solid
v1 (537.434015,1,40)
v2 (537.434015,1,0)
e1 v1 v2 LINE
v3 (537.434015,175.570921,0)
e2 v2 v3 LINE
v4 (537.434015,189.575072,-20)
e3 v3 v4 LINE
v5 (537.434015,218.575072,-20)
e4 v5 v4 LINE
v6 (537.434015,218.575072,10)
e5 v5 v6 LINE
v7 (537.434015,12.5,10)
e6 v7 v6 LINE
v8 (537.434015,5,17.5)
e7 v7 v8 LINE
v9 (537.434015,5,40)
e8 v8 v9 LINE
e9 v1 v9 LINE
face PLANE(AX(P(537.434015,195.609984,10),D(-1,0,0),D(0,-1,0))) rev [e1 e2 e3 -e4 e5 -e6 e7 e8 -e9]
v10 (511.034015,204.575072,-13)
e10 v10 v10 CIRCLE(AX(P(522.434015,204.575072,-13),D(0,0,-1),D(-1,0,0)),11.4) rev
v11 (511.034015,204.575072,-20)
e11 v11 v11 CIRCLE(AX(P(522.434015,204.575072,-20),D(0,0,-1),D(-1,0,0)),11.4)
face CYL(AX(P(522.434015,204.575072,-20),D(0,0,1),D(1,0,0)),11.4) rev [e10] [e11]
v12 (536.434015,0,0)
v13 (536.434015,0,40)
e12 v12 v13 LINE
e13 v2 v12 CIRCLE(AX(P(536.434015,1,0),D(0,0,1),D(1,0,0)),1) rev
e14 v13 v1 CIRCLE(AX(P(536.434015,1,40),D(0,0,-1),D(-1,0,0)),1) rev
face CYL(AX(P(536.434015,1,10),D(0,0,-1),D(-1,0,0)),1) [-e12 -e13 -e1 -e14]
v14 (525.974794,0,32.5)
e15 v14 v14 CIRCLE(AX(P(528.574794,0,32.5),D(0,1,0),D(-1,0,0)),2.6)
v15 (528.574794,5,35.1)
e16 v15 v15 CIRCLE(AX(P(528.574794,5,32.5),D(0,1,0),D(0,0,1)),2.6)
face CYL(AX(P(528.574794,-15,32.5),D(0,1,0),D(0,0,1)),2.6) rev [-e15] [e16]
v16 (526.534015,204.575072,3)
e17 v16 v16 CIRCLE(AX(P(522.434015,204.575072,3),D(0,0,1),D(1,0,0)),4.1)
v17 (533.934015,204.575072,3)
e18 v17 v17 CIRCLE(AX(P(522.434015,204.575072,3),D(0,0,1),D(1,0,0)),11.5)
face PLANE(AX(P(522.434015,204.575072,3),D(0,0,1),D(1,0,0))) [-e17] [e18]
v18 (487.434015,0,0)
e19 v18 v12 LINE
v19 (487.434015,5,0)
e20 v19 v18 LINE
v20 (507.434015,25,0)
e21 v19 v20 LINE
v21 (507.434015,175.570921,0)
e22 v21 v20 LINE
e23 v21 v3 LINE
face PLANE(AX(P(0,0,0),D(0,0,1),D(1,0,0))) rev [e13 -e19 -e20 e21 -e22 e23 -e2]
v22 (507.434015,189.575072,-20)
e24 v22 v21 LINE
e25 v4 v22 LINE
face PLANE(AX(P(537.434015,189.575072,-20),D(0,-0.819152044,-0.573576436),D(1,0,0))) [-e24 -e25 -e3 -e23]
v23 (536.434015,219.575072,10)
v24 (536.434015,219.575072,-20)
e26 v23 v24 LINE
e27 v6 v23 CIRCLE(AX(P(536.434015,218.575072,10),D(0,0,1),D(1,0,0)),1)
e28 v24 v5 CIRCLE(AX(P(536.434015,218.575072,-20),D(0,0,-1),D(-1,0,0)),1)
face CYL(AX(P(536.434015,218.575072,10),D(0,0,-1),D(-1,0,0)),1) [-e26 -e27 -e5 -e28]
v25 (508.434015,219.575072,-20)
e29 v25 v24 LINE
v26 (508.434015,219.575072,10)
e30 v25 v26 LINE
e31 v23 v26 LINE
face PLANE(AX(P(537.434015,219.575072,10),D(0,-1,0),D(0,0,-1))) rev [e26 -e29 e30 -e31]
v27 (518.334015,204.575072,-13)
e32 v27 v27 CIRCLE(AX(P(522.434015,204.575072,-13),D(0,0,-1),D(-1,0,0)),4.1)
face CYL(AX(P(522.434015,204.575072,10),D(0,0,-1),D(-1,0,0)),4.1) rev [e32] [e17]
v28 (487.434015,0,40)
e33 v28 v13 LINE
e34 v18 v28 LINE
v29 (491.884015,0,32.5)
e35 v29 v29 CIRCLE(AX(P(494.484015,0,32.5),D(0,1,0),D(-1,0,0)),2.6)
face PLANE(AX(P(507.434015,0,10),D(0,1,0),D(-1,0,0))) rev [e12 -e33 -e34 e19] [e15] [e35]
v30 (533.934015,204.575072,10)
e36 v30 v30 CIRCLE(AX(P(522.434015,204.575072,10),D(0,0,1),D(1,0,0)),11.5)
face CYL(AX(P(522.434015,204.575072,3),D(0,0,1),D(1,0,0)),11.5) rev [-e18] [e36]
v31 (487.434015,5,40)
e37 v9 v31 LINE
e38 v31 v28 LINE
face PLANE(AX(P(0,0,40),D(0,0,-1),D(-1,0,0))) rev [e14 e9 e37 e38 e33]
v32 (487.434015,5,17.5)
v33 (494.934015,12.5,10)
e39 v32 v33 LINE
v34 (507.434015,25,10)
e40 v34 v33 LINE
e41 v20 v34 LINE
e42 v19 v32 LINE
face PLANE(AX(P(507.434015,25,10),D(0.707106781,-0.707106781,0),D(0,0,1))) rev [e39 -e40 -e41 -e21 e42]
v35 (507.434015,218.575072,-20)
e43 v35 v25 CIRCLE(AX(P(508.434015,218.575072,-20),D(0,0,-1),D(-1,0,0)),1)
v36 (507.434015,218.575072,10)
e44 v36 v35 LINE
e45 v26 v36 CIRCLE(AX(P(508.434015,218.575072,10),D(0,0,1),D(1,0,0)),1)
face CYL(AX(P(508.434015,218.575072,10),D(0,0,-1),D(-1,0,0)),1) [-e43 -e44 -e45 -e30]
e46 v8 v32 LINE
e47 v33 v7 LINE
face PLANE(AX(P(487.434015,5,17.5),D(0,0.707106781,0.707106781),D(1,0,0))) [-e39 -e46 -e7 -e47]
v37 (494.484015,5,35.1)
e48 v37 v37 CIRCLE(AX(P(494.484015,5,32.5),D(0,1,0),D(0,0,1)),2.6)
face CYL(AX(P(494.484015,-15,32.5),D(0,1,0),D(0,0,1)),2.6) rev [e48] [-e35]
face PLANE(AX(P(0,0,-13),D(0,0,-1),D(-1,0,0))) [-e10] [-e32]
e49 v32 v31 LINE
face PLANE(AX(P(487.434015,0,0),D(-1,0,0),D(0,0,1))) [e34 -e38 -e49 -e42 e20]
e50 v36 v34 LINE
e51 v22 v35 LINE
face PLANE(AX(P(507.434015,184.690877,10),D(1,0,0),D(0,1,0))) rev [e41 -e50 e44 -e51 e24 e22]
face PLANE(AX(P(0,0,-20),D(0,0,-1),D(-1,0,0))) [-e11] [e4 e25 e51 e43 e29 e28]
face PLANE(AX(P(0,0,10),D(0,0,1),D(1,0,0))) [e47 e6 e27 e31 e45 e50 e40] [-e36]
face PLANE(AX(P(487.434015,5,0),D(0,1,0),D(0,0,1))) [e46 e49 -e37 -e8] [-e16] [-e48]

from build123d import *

# Parameters (mm, degrees)
SKETCH1_R                = 4.1
BOSS_EXTRUDE1_DEPTH      = 10
BOSS_EXTRUDE2_DEPTH      = 30
BOSS_EXTRUDE2_DEPTH_BACK = 10
SKETCH4_R                = 2.6
CUT_EXTRUDE1_DEPTH       = 20
CHAMFER1_SIZE            = 20
CHAMFER2_SIZE            = 7.5
SKETCH7_R                = 11.5
CUT_EXTRUDE2_DEPTH       = 7
BOSS_EXTRUDE4_START      = 13
SKETCH9_W                = 30
SKETCH9_H                = 30
SKETCH9_R                = 4.1
BOSS_EXTRUDE4_DEPTH      = 13
SKETCH8_W                = 30
SKETCH8_H                = 30
SKETCH8_R                = 11.4
BOSS_EXTRUDE3_DEPTH      = 7
CHAMFER3_SIZE2           = 14.004150764
CHAMFER3_SIZE            = 20
FILLET2_R                = 1


with BuildPart() as part:
    # Sketch1 → Boss-Extrude1 (new body)
    with BuildSketch(Plane.XY):
        Polygon((537.434015224, 195.609984424), (537.434015224, 0), (507.434015224, 0), (507.434015224, 184.690877396), (507.434015224, 219.575071586), (537.434015224, 219.575071586), align=None)
        with Locations((522.434015224, 204.575071586)):
            Circle(SKETCH1_R, mode=Mode.SUBTRACT)
    extrude(amount=BOSS_EXTRUDE1_DEPTH)

    # Sketch2 → Boss-Extrude2 (add, two sides: drawn at the far end of the back side and taken through both)
    with BuildSketch(Plane.XY.offset(10).offset(-BOSS_EXTRUDE2_DEPTH_BACK)):
        Polygon((507.434015224, 0), (537.434015224, 0), (537.434015224, 5), (507.434015224, 5), (487.434015224, 5), (487.434015224, 0), align=None)
    extrude(amount=BOSS_EXTRUDE2_DEPTH + BOSS_EXTRUDE2_DEPTH_BACK)

    # Sketch4 → Cut-Extrude1 (cut)
    with BuildSketch(Plane(origin=(0, 5, 0), x_dir=(1, 0, 0), z_dir=(0, 1, 0))):
        with Locations(Location((528.574793848, -32.5, 0), (0, 0, 270))):
            Circle(SKETCH4_R)
        with Locations(Location((494.484015224, -32.5, 0), (0, 0, 270))):
            Circle(SKETCH4_R)
    extrude(amount=-CUT_EXTRUDE1_DEPTH, mode=Mode.SUBTRACT)

    # Chamfer1
    chamfer1_edges = [part.edges().sort_by_distance(p)[0] for p in [
        (507.434015224, 5, 5),
    ]]
    chamfer(chamfer1_edges, length=CHAMFER1_SIZE - 0.0001)  # a hair under: the kernel refuses the full size

    # Chamfer2
    chamfer2_edges = [part.edges().sort_by_distance(p)[0] for p in [
        (512.434065224, 5, 10),
    ]]
    chamfer(chamfer2_edges, length=CHAMFER2_SIZE)

    # Sketch7 → Cut-Extrude2 (cut)
    with BuildSketch(Plane.XY.offset(10)):
        with Locations((522.434015224, 204.575071586)):
            Circle(SKETCH7_R)
    extrude(amount=-CUT_EXTRUDE2_DEPTH, mode=Mode.SUBTRACT)

    # Sketch9 → Boss-Extrude4 (add)
    with BuildSketch(Plane(origin=(0, 0, 0), x_dir=(-1, 0, 0), z_dir=(0, 0, -1)).offset(BOSS_EXTRUDE4_START)):
        with Locations((-522.434015224, 204.575071586)):
            Rectangle(SKETCH9_W, SKETCH9_H)
        with Locations((-522.434015224, 204.575071586)):
            Circle(SKETCH9_R, mode=Mode.SUBTRACT)
    extrude(amount=-BOSS_EXTRUDE4_DEPTH)

    # Sketch8 → Boss-Extrude3 (add)
    with BuildSketch(Plane(origin=(0, 0, -13), x_dir=(-1, 0, 0), z_dir=(0, 0, -1))):
        with Locations((-522.434015224, 204.575071586)):
            Rectangle(SKETCH8_W, SKETCH8_H)
        with Locations((-522.434015224, 204.575071586)):
            Circle(SKETCH8_R, mode=Mode.SUBTRACT)
    extrude(amount=BOSS_EXTRUDE3_DEPTH)

    # Chamfer3
    chamfer3_edges = [part.edges().sort_by_distance(p)[0] for p in [
        (522.434015224, 189.575071586, 0),
    ]]
    chamfer3_side = [part.faces().sort_by_distance(p)[0] for p in [
        (522.434015224, 189.575071586, -0.280083015),
    ]]
    chamfer(chamfer3_edges, length=CHAMFER3_SIZE - 0.0001, length2=CHAMFER3_SIZE2 - 0.0001, reference=chamfer3_side[0])  # a hair under: the kernel refuses the full size

    # Fillet2
    fillet2_edges = [part.edges().sort_by_distance(p)[0] for p in [
        (537.434015224, 0, 20),
        (507.434015224, 219.575071586, -5),
        (537.434015224, 219.575071586, -5),
    ]]
    fillet(fillet2_edges, radius=FILLET2_R)


solid = part.part
